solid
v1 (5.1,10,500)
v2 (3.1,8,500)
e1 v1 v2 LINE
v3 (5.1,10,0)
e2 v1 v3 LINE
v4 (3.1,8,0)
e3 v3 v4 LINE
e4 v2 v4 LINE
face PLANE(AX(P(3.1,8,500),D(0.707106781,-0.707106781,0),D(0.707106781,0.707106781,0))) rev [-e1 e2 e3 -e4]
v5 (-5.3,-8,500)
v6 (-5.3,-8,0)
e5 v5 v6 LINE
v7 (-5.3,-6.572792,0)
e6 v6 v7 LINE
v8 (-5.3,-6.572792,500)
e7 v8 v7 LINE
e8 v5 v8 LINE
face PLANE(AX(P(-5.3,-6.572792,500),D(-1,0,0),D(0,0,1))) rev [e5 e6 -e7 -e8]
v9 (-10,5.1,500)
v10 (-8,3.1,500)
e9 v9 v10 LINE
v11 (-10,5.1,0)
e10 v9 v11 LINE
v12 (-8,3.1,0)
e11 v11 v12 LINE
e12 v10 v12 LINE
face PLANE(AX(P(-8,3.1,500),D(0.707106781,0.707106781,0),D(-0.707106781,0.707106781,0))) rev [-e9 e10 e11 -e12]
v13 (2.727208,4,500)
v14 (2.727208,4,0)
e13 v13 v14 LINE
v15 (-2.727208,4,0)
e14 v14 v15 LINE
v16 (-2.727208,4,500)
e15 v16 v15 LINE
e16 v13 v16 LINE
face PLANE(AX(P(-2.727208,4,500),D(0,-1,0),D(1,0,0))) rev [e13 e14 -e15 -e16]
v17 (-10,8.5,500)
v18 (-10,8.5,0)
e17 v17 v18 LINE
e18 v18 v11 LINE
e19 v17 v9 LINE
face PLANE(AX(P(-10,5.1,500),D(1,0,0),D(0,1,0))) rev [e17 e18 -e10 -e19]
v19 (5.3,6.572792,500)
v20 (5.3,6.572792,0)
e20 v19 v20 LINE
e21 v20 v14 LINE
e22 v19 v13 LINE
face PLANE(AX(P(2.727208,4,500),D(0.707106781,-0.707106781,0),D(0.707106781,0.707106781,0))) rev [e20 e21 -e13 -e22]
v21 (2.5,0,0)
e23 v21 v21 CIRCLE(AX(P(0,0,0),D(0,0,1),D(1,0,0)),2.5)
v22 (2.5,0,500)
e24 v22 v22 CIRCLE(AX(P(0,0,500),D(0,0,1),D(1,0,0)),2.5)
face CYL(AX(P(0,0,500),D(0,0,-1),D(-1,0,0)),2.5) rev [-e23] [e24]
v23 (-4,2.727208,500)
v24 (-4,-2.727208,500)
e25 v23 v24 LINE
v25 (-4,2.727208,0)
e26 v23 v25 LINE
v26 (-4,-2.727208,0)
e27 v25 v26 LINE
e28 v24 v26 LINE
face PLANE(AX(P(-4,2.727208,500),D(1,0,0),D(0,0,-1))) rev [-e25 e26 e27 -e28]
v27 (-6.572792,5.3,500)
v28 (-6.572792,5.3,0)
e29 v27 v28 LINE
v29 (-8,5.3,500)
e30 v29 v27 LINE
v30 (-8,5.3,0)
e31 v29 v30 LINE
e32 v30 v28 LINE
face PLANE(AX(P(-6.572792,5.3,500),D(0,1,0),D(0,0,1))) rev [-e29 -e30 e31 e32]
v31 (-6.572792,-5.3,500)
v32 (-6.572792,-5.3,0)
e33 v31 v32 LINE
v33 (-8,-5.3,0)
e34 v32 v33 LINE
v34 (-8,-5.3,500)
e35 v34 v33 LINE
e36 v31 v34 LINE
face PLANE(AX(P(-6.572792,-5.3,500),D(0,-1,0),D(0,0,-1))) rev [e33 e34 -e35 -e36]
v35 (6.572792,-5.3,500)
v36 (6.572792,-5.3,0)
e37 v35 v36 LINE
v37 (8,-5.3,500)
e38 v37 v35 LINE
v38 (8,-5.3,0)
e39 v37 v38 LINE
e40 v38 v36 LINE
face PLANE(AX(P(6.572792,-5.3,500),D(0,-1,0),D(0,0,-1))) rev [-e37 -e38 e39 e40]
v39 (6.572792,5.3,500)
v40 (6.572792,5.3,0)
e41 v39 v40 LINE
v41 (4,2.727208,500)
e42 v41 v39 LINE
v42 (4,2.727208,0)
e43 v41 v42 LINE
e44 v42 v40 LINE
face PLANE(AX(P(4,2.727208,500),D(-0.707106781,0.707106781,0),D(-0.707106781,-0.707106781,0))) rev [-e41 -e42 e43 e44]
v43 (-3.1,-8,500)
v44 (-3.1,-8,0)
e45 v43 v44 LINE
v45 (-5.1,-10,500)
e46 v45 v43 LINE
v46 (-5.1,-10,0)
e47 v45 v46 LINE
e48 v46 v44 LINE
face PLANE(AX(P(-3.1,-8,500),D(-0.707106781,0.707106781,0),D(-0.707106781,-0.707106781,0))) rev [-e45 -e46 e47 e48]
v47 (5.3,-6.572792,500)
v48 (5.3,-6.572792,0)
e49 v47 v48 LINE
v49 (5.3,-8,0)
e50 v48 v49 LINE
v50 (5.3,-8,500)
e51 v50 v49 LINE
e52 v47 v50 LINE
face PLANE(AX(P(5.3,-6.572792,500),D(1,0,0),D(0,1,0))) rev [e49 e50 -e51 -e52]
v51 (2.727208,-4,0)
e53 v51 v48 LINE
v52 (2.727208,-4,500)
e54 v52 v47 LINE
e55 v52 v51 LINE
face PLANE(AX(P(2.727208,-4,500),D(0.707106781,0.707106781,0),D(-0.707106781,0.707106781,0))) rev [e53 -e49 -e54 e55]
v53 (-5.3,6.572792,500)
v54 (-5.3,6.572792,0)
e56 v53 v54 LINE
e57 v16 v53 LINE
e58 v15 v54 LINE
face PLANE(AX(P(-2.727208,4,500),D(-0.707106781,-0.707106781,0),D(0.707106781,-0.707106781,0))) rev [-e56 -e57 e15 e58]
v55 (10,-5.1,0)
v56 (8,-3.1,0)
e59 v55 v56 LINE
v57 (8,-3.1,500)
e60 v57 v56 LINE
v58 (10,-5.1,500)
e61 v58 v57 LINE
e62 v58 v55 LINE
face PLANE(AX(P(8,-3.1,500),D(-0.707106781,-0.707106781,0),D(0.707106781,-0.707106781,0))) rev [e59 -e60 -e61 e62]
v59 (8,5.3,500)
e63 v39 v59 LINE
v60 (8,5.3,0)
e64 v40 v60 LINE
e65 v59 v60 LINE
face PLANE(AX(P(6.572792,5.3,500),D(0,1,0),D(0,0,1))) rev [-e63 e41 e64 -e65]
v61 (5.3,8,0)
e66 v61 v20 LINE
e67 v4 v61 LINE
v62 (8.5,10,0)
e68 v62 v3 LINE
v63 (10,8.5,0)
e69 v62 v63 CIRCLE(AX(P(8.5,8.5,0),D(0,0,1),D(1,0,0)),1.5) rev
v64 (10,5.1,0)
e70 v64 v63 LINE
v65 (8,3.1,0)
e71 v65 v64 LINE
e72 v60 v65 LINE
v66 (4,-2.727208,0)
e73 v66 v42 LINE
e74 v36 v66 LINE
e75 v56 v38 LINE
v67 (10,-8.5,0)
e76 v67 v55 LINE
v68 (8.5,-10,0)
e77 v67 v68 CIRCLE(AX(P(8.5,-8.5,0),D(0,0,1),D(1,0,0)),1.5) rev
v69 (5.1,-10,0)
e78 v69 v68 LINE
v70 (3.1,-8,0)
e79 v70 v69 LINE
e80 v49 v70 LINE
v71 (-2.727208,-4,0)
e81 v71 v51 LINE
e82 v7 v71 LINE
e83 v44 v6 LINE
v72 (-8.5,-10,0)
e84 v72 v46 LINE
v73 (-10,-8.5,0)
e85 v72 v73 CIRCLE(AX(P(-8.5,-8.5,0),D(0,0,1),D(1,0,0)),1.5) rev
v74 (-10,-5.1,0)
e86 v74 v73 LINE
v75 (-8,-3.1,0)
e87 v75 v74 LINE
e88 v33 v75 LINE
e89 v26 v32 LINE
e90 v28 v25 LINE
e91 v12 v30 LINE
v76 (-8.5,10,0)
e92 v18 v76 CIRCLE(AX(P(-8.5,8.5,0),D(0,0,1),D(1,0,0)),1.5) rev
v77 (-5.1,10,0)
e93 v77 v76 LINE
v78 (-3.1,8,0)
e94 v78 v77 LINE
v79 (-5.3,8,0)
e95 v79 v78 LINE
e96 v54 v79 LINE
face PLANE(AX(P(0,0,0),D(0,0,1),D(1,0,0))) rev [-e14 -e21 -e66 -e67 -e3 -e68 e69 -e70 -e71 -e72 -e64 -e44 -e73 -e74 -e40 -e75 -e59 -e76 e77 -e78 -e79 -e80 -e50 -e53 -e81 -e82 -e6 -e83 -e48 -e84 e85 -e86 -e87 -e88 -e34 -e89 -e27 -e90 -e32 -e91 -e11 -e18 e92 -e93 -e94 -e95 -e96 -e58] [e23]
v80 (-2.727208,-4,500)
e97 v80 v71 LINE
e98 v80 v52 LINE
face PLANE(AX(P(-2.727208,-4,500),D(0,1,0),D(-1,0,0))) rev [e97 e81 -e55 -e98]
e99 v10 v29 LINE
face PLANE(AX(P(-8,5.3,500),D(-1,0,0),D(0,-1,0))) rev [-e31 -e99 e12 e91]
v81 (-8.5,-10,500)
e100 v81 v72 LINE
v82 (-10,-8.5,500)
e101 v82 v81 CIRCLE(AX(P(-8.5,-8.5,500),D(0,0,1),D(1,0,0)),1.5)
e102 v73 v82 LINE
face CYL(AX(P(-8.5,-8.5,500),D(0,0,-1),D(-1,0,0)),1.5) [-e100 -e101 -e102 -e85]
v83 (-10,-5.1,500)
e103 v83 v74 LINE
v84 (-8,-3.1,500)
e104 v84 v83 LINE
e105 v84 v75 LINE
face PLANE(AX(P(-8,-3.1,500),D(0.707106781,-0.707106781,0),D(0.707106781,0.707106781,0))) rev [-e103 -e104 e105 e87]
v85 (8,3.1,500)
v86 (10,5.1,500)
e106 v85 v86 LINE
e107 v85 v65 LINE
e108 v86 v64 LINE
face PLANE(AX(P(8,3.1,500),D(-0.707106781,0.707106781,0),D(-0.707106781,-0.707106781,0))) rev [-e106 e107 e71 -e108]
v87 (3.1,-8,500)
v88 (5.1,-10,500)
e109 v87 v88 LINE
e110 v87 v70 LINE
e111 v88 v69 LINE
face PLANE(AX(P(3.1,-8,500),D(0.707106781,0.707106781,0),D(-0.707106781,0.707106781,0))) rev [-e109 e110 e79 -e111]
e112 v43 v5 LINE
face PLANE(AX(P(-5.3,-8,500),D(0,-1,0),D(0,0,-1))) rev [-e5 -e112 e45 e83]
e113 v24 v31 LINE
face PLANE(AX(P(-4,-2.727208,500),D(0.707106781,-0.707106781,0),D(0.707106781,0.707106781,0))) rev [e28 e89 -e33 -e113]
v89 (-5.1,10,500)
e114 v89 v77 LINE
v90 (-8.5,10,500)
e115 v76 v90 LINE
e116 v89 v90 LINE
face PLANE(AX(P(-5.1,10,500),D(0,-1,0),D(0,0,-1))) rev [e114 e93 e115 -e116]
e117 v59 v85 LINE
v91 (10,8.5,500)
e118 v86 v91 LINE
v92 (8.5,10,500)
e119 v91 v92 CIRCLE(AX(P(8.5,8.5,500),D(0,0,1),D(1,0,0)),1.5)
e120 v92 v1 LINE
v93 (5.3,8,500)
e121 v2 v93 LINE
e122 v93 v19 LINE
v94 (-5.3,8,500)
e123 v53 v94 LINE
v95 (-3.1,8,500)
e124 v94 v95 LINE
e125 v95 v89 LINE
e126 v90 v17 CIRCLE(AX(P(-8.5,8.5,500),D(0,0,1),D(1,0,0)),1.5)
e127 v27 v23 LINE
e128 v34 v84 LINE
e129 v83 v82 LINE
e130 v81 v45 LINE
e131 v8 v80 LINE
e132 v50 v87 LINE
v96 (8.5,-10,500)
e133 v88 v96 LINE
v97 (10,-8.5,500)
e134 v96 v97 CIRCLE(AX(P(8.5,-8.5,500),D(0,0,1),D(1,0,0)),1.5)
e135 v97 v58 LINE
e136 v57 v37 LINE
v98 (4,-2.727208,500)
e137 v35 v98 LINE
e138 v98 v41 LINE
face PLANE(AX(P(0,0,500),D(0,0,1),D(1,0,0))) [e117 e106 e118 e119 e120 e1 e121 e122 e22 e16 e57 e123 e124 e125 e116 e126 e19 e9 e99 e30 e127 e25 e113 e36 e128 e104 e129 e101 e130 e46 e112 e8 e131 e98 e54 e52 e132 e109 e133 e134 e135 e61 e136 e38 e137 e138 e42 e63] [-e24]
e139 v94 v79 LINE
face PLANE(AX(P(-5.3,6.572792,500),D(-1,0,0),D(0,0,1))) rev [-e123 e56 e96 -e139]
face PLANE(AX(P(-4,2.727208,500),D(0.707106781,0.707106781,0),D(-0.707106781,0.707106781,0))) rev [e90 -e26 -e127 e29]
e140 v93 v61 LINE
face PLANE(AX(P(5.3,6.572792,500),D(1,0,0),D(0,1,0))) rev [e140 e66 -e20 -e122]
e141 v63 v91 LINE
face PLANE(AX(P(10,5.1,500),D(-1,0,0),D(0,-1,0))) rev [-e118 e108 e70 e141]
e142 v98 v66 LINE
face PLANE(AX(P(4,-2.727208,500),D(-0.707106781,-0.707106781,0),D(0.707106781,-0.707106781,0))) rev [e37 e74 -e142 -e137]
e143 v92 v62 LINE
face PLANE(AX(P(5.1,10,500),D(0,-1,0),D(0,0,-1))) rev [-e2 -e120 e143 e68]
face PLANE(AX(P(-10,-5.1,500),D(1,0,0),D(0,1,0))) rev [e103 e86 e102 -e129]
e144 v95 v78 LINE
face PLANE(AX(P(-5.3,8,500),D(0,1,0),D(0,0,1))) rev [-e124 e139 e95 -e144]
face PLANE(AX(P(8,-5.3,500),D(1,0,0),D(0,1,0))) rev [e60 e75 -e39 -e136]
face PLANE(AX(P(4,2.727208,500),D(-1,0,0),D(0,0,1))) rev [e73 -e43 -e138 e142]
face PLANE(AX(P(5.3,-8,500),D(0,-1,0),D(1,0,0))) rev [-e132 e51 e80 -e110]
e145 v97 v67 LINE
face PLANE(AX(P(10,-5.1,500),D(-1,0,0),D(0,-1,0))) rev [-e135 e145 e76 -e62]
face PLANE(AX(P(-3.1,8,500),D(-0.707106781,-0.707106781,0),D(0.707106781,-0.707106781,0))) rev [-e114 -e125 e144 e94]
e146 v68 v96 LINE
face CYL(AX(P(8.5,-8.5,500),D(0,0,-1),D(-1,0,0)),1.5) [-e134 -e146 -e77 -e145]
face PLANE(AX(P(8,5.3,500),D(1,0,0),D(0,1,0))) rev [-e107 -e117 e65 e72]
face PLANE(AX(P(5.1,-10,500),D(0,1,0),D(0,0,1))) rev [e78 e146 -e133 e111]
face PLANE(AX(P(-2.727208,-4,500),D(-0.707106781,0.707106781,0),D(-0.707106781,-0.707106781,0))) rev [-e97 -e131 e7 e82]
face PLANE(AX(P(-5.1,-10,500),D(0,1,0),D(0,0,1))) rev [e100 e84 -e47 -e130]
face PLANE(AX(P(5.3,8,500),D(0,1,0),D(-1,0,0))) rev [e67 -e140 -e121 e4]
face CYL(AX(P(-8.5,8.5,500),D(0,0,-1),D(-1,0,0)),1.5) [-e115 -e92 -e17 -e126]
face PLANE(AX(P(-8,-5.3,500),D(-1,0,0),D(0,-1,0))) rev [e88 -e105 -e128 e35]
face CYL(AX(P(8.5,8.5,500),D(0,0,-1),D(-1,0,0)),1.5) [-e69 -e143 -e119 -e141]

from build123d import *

# Parameters (mm, degrees)
EXTRUDE_1_OUTLINE_R = 2.5
EXTRUDE_1_DEPTH     = 500
FILLET_1_R          = 1.5


# Read off the part's stored shape, not the designer's step: Бобышка-Вытянуть1
with BuildPart() as part:
    # Бобышка-Вытянуть1 outline → Бобышка-Вытянуть1 (new body)
    with BuildSketch(Plane.XY):
        Polygon((4, 2.727207794), (6.572792206, 5.3), (8, 5.3), (8, 3.1), (10, 5.1), (10, 10), (5.1, 10), (3.1, 8), (5.3, 8), (5.3, 6.572792206), (2.727207794, 4), (-2.727207794, 4), (-5.3, 6.572792206), (-5.3, 8), (-3.1, 8), (-5.1, 10), (-10, 10), (-10, 5.1), (-8, 3.1), (-8, 5.3), (-6.572792206, 5.3), (-4, 2.727207794), (-4, -2.727207794), (-6.572792206, -5.3), (-8, -5.3), (-8, -3.1), (-10, -5.1), (-10, -10), (-5.1, -10), (-3.1, -8), (-5.3, -8), (-5.3, -6.572792206), (-2.727207794, -4), (2.727207794, -4), (5.3, -6.572792206), (5.3, -8), (3.1, -8), (5.1, -10), (10, -10), (10, -5.1), (8, -3.1), (8, -5.3), (6.572792206, -5.3), (4, -2.727207794), align=None)
        Circle(EXTRUDE_1_OUTLINE_R, mode=Mode.SUBTRACT)
    extrude(amount=EXTRUDE_1_DEPTH)

    # Скругление1
    fillet_1_edges = [part.edges().sort_by_distance(p)[0] for p in [
        (10, -10, 250),
        (-10, -10, 250),
        (-10, 10, 250),
        (10, 10, 250),
    ]]
    fillet(fillet_1_edges, radius=FILLET_1_R)


solid = part.part
